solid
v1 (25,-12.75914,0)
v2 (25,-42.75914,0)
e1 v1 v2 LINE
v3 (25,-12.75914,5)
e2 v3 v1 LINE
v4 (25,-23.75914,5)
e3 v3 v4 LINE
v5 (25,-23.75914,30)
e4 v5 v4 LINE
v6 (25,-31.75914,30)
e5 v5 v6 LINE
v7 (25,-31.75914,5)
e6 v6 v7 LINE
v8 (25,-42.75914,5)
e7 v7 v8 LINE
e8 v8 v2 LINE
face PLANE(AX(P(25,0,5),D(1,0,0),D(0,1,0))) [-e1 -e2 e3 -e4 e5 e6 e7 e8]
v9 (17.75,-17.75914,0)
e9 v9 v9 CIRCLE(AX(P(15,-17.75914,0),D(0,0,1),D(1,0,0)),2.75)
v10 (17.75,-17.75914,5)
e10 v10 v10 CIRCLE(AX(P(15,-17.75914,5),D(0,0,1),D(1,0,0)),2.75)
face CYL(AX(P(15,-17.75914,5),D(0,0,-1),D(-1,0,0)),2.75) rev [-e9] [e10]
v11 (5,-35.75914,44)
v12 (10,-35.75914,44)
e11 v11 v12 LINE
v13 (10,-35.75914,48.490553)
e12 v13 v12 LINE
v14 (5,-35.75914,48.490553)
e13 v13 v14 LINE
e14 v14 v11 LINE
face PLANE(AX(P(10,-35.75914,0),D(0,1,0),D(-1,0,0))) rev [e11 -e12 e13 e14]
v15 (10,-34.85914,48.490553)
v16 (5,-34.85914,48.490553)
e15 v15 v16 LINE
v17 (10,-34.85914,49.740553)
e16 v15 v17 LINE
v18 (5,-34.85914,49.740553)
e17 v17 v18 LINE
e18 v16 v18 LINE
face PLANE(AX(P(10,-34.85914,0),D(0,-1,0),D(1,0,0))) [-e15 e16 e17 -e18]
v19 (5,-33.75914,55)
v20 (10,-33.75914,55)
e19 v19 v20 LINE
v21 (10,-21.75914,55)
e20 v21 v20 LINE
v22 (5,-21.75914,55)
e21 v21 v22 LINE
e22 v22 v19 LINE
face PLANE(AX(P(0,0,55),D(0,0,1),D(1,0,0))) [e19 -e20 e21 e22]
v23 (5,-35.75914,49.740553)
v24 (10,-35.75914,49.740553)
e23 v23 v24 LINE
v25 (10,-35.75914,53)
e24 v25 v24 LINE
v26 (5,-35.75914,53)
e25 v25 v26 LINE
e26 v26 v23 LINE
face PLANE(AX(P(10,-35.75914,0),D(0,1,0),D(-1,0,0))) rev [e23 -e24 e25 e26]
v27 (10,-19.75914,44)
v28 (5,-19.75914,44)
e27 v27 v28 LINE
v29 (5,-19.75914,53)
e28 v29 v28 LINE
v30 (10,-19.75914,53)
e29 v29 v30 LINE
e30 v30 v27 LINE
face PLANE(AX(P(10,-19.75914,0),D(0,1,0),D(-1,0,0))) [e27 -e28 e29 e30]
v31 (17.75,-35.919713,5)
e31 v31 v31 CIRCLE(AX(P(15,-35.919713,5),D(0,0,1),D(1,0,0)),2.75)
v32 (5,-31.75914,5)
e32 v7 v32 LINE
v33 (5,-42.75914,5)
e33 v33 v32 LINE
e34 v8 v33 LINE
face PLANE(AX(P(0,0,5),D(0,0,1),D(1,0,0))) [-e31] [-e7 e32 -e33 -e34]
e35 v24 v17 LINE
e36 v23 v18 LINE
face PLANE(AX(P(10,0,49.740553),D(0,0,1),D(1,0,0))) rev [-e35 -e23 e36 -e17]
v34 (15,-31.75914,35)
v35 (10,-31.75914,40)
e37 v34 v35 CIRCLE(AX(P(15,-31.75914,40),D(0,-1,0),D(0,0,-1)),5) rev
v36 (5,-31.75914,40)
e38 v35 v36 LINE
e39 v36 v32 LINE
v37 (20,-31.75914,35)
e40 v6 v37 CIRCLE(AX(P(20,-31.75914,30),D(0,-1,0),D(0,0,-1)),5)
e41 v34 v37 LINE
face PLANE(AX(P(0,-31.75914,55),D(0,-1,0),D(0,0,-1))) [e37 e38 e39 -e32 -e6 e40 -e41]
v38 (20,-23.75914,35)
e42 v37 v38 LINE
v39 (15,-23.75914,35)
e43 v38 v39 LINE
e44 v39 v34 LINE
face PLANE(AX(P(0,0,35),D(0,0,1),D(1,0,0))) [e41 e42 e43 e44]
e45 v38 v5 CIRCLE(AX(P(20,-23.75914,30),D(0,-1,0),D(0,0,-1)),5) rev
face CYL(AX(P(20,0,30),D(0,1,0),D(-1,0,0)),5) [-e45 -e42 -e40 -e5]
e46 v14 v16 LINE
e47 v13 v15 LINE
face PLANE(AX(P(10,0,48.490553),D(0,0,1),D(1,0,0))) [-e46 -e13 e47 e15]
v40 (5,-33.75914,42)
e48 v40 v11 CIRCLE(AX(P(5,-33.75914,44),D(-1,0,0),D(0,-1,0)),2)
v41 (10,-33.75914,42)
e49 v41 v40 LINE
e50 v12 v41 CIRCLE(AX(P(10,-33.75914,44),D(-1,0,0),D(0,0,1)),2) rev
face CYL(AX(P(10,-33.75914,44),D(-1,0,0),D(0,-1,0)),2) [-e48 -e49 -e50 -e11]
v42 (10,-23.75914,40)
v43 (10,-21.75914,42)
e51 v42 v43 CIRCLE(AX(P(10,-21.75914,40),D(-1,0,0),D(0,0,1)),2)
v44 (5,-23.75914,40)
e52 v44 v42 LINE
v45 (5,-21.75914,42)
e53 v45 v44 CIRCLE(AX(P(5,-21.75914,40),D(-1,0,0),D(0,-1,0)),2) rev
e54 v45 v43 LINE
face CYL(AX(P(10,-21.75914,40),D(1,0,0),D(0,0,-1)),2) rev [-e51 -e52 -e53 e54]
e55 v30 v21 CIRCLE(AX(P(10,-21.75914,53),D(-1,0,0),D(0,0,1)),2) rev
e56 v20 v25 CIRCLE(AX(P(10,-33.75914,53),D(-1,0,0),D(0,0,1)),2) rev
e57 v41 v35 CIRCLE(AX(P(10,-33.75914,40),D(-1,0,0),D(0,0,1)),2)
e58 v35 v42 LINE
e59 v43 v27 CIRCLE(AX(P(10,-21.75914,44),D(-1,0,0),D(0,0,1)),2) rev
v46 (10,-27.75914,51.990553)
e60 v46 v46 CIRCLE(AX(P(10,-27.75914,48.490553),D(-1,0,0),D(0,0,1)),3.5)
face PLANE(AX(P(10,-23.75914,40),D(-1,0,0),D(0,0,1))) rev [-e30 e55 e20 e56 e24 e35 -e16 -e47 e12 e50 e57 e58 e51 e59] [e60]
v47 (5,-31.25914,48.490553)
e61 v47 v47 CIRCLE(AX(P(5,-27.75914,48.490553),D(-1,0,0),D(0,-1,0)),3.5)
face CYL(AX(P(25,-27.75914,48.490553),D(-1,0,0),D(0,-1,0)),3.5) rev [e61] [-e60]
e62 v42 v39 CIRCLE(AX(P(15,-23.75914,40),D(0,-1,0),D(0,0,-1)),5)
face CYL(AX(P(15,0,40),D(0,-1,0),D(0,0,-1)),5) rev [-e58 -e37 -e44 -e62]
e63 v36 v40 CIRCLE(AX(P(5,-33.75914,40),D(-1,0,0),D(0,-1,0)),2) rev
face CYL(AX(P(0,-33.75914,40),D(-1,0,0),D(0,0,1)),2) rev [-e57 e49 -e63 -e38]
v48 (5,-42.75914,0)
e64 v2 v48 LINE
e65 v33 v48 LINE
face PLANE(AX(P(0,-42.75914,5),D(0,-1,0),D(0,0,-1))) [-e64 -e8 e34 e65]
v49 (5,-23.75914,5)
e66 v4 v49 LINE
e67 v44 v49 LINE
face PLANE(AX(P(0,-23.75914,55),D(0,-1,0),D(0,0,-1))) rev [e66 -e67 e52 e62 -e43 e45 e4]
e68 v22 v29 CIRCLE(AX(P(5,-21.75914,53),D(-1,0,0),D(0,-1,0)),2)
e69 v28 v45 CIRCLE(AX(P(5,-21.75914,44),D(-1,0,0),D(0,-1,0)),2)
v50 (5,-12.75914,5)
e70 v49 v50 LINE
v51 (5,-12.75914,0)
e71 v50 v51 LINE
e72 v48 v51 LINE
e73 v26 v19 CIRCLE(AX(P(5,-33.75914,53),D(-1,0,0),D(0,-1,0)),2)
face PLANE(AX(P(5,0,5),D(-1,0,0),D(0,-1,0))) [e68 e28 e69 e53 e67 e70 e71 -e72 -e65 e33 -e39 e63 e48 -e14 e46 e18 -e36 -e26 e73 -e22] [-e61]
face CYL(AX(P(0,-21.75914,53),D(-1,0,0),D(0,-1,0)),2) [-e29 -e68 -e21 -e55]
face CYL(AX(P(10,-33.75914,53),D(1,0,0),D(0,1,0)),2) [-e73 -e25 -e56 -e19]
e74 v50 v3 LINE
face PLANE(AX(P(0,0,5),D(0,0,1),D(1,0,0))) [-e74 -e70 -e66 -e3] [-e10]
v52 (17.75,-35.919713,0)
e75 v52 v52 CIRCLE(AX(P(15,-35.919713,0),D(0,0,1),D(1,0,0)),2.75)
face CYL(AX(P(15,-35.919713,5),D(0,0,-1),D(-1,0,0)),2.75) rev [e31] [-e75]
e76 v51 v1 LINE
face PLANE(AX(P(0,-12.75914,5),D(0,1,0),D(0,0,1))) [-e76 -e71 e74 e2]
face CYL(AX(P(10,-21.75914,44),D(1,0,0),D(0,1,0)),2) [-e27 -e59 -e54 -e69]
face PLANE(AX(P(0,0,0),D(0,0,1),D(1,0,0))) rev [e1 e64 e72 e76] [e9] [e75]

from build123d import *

# Parameters (mm, degrees)
SKETCH1_R               = 2.75
BOSS_EXTRUDE1_DEPTH     = 5
SKETCH2_W               = 20
SKETCH2_H               = 4
BOSS_EXTRUDE2_DEPTH     = 50
CUT_EXTRUDE1_DEPTH      = 73.479956342
CUT_EXTRUDE1_DEPTH_BACK = 73.479956342
SKETCH5_W               = 15
SKETCH5_H               = 8
CUT_EXTRUDE2_DEPTH      = 15
SKETCH6_W               = 15
SKETCH6_H               = 8
CUT_EXTRUDE3_DEPTH      = 5
FILLET1_R               = 5
SKETCH7_W               = 13
SKETCH7_H               = 4
BOSS_EXTRUDE3_DEPTH     = 5
SKETCH8_R               = 3.5
CUT_EXTRUDE5_DEPTH      = 73.479956342
SKETCH9_W               = 1.25
SKETCH9_H               = 0.9
SKETCH9_H_2             = 0.5
CUT_EXTRUDE6_DEPTH      = 5
FILLET2_R               = 2


with BuildPart() as part:
    # Sketch1 → Boss-Extrude1 (new body)
    with BuildSketch(Plane.XY):
        Polygon((15, -12.759140208), (25, -12.759140208), (25, -42.759140208), (5, -42.759140208), (5, -12.759140208), align=None)
        with Locations((15, -35.919713403)):
            Circle(SKETCH1_R, mode=Mode.SUBTRACT)
        with Locations((15, -17.759140208)):
            Circle(SKETCH1_R, mode=Mode.SUBTRACT)
    extrude(amount=BOSS_EXTRUDE1_DEPTH)

    # Sketch2 → Boss-Extrude2 (add)
    with BuildSketch(Plane.XY.offset(5)):
        with Locations((15, -25.759140208)):
            Rectangle(SKETCH2_W, SKETCH2_H)
        with Locations((15, -29.759140208)):
            Rectangle(SKETCH2_W, SKETCH2_H)
    extrude(amount=BOSS_EXTRUDE2_DEPTH)

    # Sketch3 → Cut-Extrude1 (cut, two sides: drawn at the far end of the back side and taken through both)
    with BuildSketch(Plane(origin=(25, 0, 0), x_dir=(0, 0, -1), z_dir=(1, 0, 0)).offset(-CUT_EXTRUDE1_DEPTH_BACK)):
        with BuildLine():
            Line((-46.695516884, -26.87718455), (-48.490552878, -27.759140208))
            Line((-48.490552878, -27.759140208), (-46.490552878, -27.759140208))
            ThreePointArc((-46.490552878, -27.759140208), (-46.542467666, -27.306410701), (-46.695516884, -26.87718455))
        make_face()
        with BuildLine():
            Line((-50.490552878, -27.759140208), (-48.490552878, -27.759140208))
            Line((-48.490552878, -27.759140208), (-46.695516884, -26.87718455))
            ThreePointArc((-46.695516884, -26.87718455), (-48.943282385, -25.811054996), (-50.490552878, -27.759140208))
        make_face()
        with BuildLine():
            Line((-46.490552878, -27.759140208), (-48.490552878, -27.759140208))
            Line((-48.490552878, -27.759140208), (-50.490552878, -27.759140208))
            ThreePointArc((-50.490552878, -27.759140208), (-48.490552878, -29.759140208), (-46.490552878, -27.759140208))
        make_face()
    extrude(amount=CUT_EXTRUDE1_DEPTH + CUT_EXTRUDE1_DEPTH_BACK, mode=Mode.SUBTRACT)

    # Sketch5 → Cut-Extrude2 (cut)
    with BuildSketch(Plane.XY.offset(55)):
        with Locations((17.5, -27.759140208)):
            Rectangle(SKETCH5_W, SKETCH5_H)
    extrude(amount=-CUT_EXTRUDE2_DEPTH, mode=Mode.SUBTRACT)

    # Sketch6 → Cut-Extrude3 (cut)
    with BuildSketch(Plane.XY.offset(40)):
        with Locations((17.5, -27.759140208)):
            Rectangle(SKETCH6_W, SKETCH6_H)
    extrude(amount=-CUT_EXTRUDE3_DEPTH, mode=Mode.SUBTRACT)

    # Fillet1
    fillet1_edges = [part.edges().sort_by_distance(p)[0] for p in [
        (10, -27.759140208, 35),
        (25, -27.759140208, 35),
    ]]
    fillet(fillet1_edges, radius=FILLET1_R)

    # Sketch7 → Boss-Extrude3 (add)
    with BuildSketch(Plane.ZY.offset(-5)):
        with Locations((48.5, -33.759140208)):
            Rectangle(SKETCH7_W, SKETCH7_H)
        with Locations((48.5, -21.759140208)):
            Rectangle(SKETCH7_W, SKETCH7_H)
    extrude(amount=-BOSS_EXTRUDE3_DEPTH)

    # Sketch8 → Cut-Extrude5 (cut, through all)
    with BuildSketch(Plane.ZY.offset(-5)):
        with Locations(Location((48.490552878, -27.759140208, 0), (0, 0, 270))):
            Circle(SKETCH8_R)
    extrude(amount=-CUT_EXTRUDE5_DEPTH, mode=Mode.SUBTRACT)

    # Sketch9 → Cut-Extrude6 (cut)
    with BuildSketch(Plane.ZY.offset(-5)):
        with Locations((49.115552878, -35.309140208)):
            Rectangle(SKETCH9_W, SKETCH9_H)
        with Locations((47.865552878, -36.009140208)):
            Rectangle(SKETCH9_W, SKETCH9_H_2)
        with Locations((49.115552878, -36.009140208)):
            Rectangle(SKETCH9_W, SKETCH9_H_2)
    extrude(amount=-CUT_EXTRUDE6_DEPTH, mode=Mode.SUBTRACT)

    # Fillet2
    fillet2_edges = [part.edges().sort_by_distance(p)[0] for p in [
        (7.5, -23.759140208, 42),
        (7.5, -31.759140208, 42),
        (7.5, -35.759140208, 42),
        (7.5, -19.759140208, 42),
        (7.5, -19.759140208, 55),
        (7.5, -35.759140208, 55),
    ]]
    fillet(fillet2_edges, radius=FILLET2_R - 0.0001)  # a hair under: the kernel refuses the full size


solid = part.part
